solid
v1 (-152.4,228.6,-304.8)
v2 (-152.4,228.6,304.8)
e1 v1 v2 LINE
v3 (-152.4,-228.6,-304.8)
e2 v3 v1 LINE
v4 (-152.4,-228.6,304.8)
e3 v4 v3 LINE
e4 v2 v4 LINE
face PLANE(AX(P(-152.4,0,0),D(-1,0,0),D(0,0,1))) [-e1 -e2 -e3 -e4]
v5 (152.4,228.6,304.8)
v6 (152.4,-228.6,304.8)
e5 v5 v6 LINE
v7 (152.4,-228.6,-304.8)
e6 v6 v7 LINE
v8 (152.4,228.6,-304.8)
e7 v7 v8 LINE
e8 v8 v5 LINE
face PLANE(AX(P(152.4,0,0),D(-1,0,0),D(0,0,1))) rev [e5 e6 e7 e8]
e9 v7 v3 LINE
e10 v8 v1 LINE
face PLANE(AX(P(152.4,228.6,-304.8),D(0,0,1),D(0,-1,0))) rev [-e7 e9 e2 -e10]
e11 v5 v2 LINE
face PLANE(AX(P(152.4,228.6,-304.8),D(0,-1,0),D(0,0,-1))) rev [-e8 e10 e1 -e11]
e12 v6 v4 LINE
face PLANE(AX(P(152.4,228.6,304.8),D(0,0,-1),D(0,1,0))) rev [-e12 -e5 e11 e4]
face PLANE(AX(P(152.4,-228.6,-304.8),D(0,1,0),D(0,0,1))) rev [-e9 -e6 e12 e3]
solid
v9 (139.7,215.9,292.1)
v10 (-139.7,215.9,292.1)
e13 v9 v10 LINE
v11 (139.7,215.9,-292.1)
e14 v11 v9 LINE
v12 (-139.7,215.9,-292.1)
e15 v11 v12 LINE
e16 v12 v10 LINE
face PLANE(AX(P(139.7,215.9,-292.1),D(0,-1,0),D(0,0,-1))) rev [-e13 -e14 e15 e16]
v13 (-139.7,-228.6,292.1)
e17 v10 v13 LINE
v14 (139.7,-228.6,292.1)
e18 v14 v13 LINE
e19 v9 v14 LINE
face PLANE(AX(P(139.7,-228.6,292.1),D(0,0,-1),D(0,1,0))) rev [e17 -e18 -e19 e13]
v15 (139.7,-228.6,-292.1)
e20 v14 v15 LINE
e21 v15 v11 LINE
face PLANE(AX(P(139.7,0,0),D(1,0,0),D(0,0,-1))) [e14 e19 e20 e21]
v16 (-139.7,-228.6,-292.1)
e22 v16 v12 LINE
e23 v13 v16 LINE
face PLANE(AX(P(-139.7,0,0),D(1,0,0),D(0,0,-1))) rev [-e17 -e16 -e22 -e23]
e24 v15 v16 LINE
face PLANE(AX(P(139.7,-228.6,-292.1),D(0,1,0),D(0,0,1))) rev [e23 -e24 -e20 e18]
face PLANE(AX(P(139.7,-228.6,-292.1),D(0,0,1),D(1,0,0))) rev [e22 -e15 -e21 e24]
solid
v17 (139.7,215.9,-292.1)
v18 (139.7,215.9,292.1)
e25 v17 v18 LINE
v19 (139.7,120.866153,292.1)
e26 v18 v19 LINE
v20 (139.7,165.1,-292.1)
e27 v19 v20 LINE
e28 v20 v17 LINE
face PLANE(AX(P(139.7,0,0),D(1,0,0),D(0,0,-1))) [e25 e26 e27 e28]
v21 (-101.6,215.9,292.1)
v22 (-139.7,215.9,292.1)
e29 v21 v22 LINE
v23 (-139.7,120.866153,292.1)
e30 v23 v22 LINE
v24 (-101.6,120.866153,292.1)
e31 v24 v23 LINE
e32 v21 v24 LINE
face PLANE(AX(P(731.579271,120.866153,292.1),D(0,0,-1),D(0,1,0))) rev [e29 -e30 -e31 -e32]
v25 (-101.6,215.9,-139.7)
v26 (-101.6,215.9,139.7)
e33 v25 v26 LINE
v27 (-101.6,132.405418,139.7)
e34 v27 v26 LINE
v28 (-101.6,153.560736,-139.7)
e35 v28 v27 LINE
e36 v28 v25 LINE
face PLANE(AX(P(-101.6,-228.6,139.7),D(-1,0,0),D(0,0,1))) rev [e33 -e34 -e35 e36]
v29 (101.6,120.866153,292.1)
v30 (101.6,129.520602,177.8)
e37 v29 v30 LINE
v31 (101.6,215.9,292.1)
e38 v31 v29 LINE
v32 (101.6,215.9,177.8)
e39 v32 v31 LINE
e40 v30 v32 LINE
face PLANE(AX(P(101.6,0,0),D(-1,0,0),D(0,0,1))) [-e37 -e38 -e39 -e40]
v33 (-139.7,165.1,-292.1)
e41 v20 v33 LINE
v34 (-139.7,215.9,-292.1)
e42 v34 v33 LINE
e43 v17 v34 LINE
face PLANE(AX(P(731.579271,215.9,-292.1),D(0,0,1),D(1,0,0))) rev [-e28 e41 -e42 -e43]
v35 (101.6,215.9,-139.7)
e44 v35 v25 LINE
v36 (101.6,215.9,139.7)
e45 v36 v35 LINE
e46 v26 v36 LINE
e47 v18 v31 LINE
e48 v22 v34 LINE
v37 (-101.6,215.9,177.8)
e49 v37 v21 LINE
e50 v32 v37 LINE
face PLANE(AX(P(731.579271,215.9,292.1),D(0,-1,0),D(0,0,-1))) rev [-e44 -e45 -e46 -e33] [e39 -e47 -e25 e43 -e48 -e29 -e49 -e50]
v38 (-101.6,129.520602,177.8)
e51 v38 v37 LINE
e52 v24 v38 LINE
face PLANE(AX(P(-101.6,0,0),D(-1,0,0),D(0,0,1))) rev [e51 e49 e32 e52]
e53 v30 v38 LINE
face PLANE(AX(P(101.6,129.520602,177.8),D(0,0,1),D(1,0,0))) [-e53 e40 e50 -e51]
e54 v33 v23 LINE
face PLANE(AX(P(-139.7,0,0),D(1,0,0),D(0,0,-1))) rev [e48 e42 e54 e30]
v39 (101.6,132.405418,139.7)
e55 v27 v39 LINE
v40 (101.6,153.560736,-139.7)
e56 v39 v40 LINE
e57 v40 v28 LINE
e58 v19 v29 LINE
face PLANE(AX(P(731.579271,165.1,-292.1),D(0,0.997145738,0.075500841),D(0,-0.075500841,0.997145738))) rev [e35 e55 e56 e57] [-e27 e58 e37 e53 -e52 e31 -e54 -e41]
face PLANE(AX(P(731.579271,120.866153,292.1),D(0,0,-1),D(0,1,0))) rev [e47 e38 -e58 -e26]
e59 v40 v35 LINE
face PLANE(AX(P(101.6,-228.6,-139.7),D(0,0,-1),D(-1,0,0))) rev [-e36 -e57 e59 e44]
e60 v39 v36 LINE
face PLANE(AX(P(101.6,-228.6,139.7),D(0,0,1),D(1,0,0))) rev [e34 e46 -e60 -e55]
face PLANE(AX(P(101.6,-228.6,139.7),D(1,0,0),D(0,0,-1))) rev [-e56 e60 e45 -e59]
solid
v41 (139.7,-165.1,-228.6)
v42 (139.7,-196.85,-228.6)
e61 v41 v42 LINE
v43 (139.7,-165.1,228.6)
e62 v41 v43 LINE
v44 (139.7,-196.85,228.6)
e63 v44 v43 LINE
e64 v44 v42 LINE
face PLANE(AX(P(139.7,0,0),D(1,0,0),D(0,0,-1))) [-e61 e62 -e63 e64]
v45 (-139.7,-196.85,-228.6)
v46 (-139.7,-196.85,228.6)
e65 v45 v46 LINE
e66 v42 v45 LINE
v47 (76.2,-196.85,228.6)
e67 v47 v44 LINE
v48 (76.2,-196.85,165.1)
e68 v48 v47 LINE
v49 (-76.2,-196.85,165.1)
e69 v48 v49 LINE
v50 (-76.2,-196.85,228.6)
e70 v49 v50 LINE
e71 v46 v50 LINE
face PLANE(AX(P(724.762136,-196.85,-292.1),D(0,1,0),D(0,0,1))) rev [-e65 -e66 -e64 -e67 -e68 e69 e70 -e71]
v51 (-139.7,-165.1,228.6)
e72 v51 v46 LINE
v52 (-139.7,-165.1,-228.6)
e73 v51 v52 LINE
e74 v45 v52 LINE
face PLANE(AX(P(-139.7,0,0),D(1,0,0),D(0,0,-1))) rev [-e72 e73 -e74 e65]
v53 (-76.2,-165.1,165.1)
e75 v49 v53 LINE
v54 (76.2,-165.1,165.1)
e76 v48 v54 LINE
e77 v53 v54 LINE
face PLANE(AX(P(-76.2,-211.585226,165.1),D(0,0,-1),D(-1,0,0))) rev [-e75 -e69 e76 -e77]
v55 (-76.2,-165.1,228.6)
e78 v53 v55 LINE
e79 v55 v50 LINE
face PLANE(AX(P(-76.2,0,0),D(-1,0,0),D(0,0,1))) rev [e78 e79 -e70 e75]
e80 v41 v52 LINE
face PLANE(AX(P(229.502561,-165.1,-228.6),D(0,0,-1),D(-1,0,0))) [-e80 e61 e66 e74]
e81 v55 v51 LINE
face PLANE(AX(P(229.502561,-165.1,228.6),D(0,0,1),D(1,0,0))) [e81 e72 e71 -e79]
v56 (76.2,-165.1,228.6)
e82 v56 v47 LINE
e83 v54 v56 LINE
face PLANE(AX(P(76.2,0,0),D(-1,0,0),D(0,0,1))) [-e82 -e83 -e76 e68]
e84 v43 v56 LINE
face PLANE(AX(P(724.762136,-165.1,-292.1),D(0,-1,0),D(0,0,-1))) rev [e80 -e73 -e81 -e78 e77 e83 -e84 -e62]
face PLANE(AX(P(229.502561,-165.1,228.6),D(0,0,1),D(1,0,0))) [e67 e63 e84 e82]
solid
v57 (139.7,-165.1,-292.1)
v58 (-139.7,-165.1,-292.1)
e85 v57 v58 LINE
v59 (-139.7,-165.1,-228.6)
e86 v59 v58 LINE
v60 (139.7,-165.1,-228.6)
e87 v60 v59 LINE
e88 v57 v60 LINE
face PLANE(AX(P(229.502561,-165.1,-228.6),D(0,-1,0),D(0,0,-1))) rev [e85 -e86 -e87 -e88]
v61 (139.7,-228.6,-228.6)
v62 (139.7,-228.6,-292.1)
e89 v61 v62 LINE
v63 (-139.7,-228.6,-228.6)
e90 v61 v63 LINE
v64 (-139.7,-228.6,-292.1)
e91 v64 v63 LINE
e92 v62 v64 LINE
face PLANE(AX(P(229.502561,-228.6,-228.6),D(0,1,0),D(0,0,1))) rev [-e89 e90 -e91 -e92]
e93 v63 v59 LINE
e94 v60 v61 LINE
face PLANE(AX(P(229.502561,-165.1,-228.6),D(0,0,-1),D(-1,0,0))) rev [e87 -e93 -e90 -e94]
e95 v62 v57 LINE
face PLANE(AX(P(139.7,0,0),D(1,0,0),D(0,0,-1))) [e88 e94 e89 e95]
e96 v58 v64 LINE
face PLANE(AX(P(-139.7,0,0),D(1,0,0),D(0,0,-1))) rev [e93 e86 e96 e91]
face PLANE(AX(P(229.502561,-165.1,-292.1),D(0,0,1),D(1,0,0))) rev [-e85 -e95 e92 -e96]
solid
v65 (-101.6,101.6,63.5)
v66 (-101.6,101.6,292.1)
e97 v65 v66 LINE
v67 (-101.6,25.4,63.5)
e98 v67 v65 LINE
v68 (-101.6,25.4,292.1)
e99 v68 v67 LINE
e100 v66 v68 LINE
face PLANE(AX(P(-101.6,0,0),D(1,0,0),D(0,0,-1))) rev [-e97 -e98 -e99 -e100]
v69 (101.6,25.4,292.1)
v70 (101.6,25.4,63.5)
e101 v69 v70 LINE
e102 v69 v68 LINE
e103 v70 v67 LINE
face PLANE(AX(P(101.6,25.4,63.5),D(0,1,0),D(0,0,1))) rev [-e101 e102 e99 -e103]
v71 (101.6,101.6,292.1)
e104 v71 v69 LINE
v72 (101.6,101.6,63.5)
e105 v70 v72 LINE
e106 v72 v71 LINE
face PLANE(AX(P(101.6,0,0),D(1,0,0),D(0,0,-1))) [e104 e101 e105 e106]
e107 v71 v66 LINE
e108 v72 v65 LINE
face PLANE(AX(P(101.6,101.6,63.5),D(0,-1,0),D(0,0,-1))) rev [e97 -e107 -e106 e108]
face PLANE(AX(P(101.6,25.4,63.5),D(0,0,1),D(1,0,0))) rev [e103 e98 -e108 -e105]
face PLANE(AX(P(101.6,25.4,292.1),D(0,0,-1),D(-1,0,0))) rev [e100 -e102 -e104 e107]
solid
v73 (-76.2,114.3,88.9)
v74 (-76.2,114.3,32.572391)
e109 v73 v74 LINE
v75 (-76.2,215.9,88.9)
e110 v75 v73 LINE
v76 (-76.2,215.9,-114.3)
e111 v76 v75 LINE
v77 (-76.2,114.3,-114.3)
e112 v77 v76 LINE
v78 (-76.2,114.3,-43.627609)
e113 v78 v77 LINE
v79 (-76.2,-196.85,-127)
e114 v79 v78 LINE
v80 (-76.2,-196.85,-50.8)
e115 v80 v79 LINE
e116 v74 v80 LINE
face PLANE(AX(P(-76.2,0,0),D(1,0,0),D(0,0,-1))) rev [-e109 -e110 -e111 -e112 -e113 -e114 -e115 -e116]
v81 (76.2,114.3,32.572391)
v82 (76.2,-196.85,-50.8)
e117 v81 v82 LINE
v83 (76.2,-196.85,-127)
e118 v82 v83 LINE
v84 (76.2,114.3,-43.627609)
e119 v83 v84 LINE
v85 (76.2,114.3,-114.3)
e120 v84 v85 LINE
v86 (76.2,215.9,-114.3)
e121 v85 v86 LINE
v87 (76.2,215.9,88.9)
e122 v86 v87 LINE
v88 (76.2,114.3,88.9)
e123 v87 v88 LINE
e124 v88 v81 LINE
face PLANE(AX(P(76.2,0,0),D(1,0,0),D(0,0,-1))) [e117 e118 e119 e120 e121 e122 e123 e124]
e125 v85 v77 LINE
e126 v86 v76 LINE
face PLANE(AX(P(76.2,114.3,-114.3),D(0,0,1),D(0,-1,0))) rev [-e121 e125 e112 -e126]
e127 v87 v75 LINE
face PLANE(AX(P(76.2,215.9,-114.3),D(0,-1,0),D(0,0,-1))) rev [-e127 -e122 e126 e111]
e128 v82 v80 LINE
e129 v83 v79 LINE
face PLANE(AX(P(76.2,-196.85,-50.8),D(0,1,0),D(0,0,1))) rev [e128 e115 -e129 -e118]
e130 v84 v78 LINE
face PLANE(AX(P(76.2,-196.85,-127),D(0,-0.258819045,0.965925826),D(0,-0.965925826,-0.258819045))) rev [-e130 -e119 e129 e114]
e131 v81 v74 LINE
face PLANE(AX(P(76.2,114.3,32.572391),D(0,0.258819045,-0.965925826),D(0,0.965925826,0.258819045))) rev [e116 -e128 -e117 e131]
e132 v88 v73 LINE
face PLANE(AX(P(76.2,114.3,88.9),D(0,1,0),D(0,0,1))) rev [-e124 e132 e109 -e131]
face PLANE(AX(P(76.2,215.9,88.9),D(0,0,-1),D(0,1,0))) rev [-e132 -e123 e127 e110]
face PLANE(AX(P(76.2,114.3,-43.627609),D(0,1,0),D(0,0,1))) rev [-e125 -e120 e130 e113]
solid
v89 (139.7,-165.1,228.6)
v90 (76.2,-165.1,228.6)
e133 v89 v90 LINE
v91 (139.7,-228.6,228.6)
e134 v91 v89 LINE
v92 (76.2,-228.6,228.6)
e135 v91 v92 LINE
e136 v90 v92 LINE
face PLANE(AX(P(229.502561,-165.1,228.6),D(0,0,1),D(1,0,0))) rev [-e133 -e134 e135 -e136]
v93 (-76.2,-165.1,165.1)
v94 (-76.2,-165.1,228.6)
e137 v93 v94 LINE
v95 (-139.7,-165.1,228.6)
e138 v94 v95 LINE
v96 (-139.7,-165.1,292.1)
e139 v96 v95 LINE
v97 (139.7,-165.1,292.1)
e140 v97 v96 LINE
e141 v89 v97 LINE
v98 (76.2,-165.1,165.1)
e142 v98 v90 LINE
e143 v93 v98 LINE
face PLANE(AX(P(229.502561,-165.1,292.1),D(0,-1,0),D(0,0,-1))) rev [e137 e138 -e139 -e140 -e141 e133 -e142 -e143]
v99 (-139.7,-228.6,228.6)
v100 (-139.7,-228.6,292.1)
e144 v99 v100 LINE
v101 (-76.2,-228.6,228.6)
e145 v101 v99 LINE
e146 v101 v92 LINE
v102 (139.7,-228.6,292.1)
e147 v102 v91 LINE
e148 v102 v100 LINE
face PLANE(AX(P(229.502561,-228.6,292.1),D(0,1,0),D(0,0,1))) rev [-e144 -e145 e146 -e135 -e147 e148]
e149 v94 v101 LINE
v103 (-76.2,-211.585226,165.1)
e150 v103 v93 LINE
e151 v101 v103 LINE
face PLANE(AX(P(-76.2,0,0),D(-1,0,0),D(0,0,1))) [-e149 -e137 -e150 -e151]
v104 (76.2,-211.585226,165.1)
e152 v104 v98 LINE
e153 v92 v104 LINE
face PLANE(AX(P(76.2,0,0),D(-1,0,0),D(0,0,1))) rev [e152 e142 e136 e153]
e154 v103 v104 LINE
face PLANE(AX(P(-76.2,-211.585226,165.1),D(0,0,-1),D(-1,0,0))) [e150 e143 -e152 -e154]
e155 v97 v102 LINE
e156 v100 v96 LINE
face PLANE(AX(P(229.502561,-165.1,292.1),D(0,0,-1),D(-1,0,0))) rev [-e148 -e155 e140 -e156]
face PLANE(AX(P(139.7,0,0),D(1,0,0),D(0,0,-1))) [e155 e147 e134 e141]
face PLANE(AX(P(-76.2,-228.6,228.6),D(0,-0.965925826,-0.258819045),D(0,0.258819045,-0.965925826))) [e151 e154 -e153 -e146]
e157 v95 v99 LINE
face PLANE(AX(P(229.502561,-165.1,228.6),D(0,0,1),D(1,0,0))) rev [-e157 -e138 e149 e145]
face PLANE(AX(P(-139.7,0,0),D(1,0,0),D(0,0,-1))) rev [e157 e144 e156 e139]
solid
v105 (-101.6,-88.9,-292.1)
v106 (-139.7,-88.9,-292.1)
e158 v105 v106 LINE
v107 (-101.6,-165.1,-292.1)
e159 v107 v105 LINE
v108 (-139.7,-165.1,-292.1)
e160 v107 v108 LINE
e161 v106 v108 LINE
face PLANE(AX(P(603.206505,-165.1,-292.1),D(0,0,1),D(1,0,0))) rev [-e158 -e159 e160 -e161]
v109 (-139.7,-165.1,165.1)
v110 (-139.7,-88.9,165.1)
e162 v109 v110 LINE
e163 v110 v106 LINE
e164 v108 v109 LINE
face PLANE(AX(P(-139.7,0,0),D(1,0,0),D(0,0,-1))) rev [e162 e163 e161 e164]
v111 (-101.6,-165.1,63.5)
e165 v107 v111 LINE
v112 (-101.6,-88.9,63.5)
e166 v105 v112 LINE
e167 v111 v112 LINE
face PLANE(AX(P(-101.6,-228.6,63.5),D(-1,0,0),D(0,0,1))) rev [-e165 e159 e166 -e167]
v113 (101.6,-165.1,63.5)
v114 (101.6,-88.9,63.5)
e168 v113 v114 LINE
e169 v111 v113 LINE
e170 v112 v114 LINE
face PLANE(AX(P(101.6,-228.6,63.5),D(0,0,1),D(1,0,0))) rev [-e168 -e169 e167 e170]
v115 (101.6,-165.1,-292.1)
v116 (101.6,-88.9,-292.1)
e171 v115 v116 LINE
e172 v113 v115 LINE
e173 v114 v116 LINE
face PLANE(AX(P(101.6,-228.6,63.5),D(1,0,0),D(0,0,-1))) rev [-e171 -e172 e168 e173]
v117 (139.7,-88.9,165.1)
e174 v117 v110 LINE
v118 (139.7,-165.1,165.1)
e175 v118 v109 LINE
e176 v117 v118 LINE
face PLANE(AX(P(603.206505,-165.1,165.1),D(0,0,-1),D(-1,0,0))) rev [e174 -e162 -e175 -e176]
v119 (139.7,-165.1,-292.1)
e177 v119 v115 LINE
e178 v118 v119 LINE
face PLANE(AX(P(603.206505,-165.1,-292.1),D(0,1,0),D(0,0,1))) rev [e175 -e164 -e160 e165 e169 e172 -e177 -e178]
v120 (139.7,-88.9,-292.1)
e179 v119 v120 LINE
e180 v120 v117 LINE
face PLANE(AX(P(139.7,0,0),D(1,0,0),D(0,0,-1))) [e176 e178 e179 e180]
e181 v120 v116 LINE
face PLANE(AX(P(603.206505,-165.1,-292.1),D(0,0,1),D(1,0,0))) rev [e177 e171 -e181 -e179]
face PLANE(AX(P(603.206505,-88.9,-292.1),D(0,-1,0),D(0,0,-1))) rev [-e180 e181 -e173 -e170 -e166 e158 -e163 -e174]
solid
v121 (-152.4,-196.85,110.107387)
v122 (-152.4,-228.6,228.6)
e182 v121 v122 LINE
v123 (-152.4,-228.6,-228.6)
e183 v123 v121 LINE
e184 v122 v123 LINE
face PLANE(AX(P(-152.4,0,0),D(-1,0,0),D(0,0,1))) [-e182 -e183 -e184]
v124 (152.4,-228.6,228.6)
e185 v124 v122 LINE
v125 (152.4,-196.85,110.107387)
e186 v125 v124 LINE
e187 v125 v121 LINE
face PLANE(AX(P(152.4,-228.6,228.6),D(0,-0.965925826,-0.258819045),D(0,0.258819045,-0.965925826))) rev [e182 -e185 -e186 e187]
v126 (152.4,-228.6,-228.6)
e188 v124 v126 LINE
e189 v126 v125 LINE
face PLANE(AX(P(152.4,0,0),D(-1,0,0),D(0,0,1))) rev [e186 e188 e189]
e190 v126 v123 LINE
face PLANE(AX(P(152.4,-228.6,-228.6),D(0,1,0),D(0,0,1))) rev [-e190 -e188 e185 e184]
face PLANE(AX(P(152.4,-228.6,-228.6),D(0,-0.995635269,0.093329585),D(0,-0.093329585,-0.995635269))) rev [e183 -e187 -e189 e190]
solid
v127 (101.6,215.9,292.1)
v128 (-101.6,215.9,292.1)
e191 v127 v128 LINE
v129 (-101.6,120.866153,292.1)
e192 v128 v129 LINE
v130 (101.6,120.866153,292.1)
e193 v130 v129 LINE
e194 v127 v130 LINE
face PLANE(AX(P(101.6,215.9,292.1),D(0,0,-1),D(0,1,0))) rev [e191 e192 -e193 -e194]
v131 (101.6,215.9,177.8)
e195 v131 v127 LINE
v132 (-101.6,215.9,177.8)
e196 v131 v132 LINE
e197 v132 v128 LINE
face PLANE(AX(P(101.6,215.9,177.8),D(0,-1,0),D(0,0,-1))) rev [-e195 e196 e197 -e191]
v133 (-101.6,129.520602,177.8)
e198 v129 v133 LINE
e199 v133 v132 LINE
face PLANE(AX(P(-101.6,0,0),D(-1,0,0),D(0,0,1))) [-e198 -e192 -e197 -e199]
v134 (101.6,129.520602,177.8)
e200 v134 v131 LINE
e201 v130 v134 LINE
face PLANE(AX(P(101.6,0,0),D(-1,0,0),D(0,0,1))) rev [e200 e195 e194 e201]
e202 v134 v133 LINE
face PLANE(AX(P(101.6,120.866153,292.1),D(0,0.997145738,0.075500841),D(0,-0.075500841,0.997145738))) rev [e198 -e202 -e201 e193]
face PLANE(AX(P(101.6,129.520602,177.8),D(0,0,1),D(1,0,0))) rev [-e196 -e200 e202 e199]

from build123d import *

# Parameters (mm, degrees)
SKETCH2_W                               = 609.6
SKETCH2_H                               = 457.2
VOLUME_ENVELOPE_DEPTH                   = 152.4
SKETCH4_W                               = 584.2
SKETCH4_H                               = 444.5
SAFE_VOLUME_DEPTH                       = 139.7
RAMP_INTERFERENCE_DEPTH                 = 152.4
DRIVE_SYSTEM_REACH                      = 412.35
SKETCH5_W                               = 63.5
SKETCH5_H                               = 63.5
DRIVE_SYSTEM_DIRECTION_2_REACH          = 412.35
DRIVE_MOTOR_DEPTH                       = 76.2
DRIVE_MOTOR_DEPTH_BACK                  = 76.2
BASE_PLATE_REACH                        = 412.35
SKETCH7_W                               = 584.2
SKETCH7_H                               = 31.75
BASE_PLATE_DIRECTION_2_REACH            = 412.35
INDENT1_START                           = 165.1
INDENT1_OUTLINE_W                       = 152.4
INDENT1_OUTLINE_H                       = 31.75
INDENT1_DEPTH                           = 127
INDENT1_START_2                         = -292.1
INDENT1_2_OUTLINE_W                     = 279.4
INDENT1_2_OUTLINE_H                     = 31.75
INDENT1_2_DEPTH                         = 63.5
INDENT1_START_3                         = 228.6
INDENT1_3_OUTLINE_W                     = 63.5
INDENT1_3_OUTLINE_H                     = 31.75
INDENT1_3_DEPTH                         = 63.5
SLIDE_SYSTEM_REACH                      = 412.35
SLIDE_SYSTEM_DIRECTION_2_REACH          = 412.35
SKETCH9_W                               = 203.2
SKETCH9_H                               = 279.4
MARIOCUTOUT_DEPTH                       = 561.097357608
SORTER_DEPTH                            = 101.6
SORTERCUTOUT_START                      = -101.6
SORTERCUTOUT_DEPTH                      = 203.2
SKETCH11_W                              = 228.6
SKETCH11_H                              = 76.2
LUMA_DEPOSITER_DEPTH                    = 101.6
MARIO_LIFTER_DEPTH                      = 76.2
KOOPER_COIN_MECHANISM_REACH             = 412.35
SKETCH13_W                              = 457.2
SKETCH13_H                              = 76.2
KOOPER_COIN_MECHANISM_DIRECTION_2_REACH = 412.35
SKETCH14_W                              = 203.2
SKETCH14_H                              = 355.6
CUT_EXTRUDE2_DEPTH                      = 466.762868851


# Read off the part's stored shape, not the designer's step: Indent1, SorterCutout
with BuildPart() as part:
    # Sketch2 → Volume Envelope (new, symmetric)
    with BuildSketch(Plane(origin=(0, 0, 0), x_dir=(0, 0, -1), z_dir=(1, 0, 0))):
        Rectangle(SKETCH2_W, SKETCH2_H)
    extrude(amount=VOLUME_ENVELOPE_DEPTH, both=True)


with BuildPart() as body_2:
    # Sketch4 → Safe Volume (new, symmetric)
    with BuildSketch(Plane(origin=(0, 0, 0), x_dir=(0, 0, -1), z_dir=(1, 0, 0))):
        with Locations((0, -6.35)):
            Rectangle(SKETCH4_W, SKETCH4_H)
    extrude(amount=SAFE_VOLUME_DEPTH, both=True)


with BuildPart() as body_3:
    # Sketch1 → Ramp Interference (new, symmetric)
    with BuildSketch(Plane(origin=(0, 0, 0), x_dir=(0, 0, -1), z_dir=(1, 0, 0))):
        Polygon((-228.6, -228.6), (-110.10738686, -196.85), (228.6, -228.6), align=None)
    extrude(amount=RAMP_INTERFERENCE_DEPTH, both=True)


with BuildPart() as body_4:

    # Drive System: up to this face of the body (flat: up to its plane)
    drive_system_end = Plane(body_2.part.faces().sort_by_distance((139.7, -6.35, 0))[0])
    # Sketch5 → Drive System (new, up to the picked face)
    with BuildSketch(Plane(origin=(0, 0, 0), x_dir=(0, 0, -1), z_dir=(1, 0, 0)), mode=Mode.PRIVATE) as drive_system_sk1:
        with Locations((-260.35, -196.85)):
            Rectangle(SKETCH5_W, SKETCH5_H)
    drive_system_tool1 = split(extrude(drive_system_sk1.sketch, amount=DRIVE_SYSTEM_REACH, mode=Mode.PRIVATE), bisect_by=drive_system_end, keep=Keep.BOTH, mode=Mode.PRIVATE)
    # Sketch5 → Drive System (new, up to the picked face)
    with BuildSketch(Plane(origin=(0, 0, 0), x_dir=(0, 0, -1), z_dir=(1, 0, 0)), mode=Mode.PRIVATE) as drive_system_sk2:
        with Locations((260.35, -196.85)):
            Rectangle(SKETCH5_W, SKETCH5_H)
    drive_system_tool2 = split(extrude(drive_system_sk2.sketch, amount=DRIVE_SYSTEM_REACH, mode=Mode.PRIVATE), bisect_by=drive_system_end, keep=Keep.BOTH, mode=Mode.PRIVATE)
    add(drive_system_tool1.solids().sort_by(Axis((0, -196.85, 260.35), (1, 0, 0)))[0])
    add(drive_system_tool2.solids().sort_by(Axis((0, -196.85, -260.35), (1, 0, 0)))[0])


    # Drive System direction 2: up to this face of the body (flat: up to its plane)
    drive_system_direction_2_end = Plane(body_2.part.faces().sort_by_distance((-139.7, -6.35, 0))[0])
    # Sketch5 → Drive System direction 2 (add, up to the picked face)
    with BuildSketch(Plane(origin=(0, 0, 0), x_dir=(0, 0, -1), z_dir=(1, 0, 0)), mode=Mode.PRIVATE) as drive_system_direction_2_sk1:
        with Locations((-260.35, -196.85)):
            Rectangle(SKETCH5_W, SKETCH5_H)
    drive_system_direction_2_tool1 = split(extrude(drive_system_direction_2_sk1.sketch, amount=-DRIVE_SYSTEM_DIRECTION_2_REACH, mode=Mode.PRIVATE), bisect_by=drive_system_direction_2_end, keep=Keep.BOTH, mode=Mode.PRIVATE)
    # Sketch5 → Drive System direction 2 (add, up to the picked face)
    with BuildSketch(Plane(origin=(0, 0, 0), x_dir=(0, 0, -1), z_dir=(1, 0, 0)), mode=Mode.PRIVATE) as drive_system_direction_2_sk2:
        with Locations((260.35, -196.85)):
            Rectangle(SKETCH5_W, SKETCH5_H)
    drive_system_direction_2_tool2 = split(extrude(drive_system_direction_2_sk2.sketch, amount=-DRIVE_SYSTEM_DIRECTION_2_REACH, mode=Mode.PRIVATE), bisect_by=drive_system_direction_2_end, keep=Keep.BOTH, mode=Mode.PRIVATE)
    add(drive_system_direction_2_tool1.solids().sort_by(Axis((0, -196.85, 260.35), (-1, 0, 0)))[0])
    add(drive_system_direction_2_tool2.solids().sort_by(Axis((0, -196.85, -260.35), (-1, 0, 0)))[0])

    # Sketch6 → Drive Motor (add, two sides: drawn at the far end of the back side and taken through both)
    with BuildSketch(Plane(origin=(0, 0, 0), x_dir=(0, 0, -1), z_dir=(1, 0, 0)).offset(-DRIVE_MOTOR_DEPTH_BACK)):
        Polygon((-228.6, -228.6), (-165.1, -211.585226281), (-165.1, -165.1), (-228.6, -165.1), align=None)
    extrude(amount=DRIVE_MOTOR_DEPTH + DRIVE_MOTOR_DEPTH_BACK)


with BuildPart() as body_5:

    # Base Plate: up to this face of the body (flat: up to its plane)
    base_plate_end = Plane(body_2.part.faces().sort_by_distance((139.7, -6.35, 0))[0])
    # Sketch7 → Base Plate (new, up to the picked face)
    with BuildSketch(Plane(origin=(0, 0, 0), x_dir=(0, 0, -1), z_dir=(1, 0, 0)), mode=Mode.PRIVATE) as base_plate_sk1:
        with Locations((0, -180.975)):
            Rectangle(SKETCH7_W, SKETCH7_H)
    base_plate_tool1 = split(extrude(base_plate_sk1.sketch, amount=BASE_PLATE_REACH, mode=Mode.PRIVATE), bisect_by=base_plate_end, keep=Keep.BOTH, mode=Mode.PRIVATE)
    add(base_plate_tool1.solids().sort_by(Axis((0, -180.975, 0), (1, 0, 0)))[0])


    # Base Plate direction 2: up to this face of the body (flat: up to its plane)
    base_plate_direction_2_end = Plane(body_2.part.faces().sort_by_distance((-139.7, -6.35, 0))[0])
    # Sketch7 → Base Plate direction 2 (add, up to the picked face)
    with BuildSketch(Plane(origin=(0, 0, 0), x_dir=(0, 0, -1), z_dir=(1, 0, 0)), mode=Mode.PRIVATE) as base_plate_direction_2_sk1:
        with Locations((0, -180.975)):
            Rectangle(SKETCH7_W, SKETCH7_H)
    base_plate_direction_2_tool1 = split(extrude(base_plate_direction_2_sk1.sketch, amount=-BASE_PLATE_DIRECTION_2_REACH, mode=Mode.PRIVATE), bisect_by=base_plate_direction_2_end, keep=Keep.BOTH, mode=Mode.PRIVATE)
    add(base_plate_direction_2_tool1.solids().sort_by(Axis((0, -180.975, 0), (-1, 0, 0)))[0])

    # Indent1 outline → Indent1 (cut)
    with BuildSketch(Plane.XY.offset(INDENT1_START)):
        with Locations((0, -180.975)):
            Rectangle(INDENT1_OUTLINE_W, INDENT1_OUTLINE_H)
    extrude(amount=INDENT1_DEPTH, mode=Mode.SUBTRACT)

    # Indent1 2 outline → Indent1 2 (cut)
    with BuildSketch(Plane.XY.offset(INDENT1_START_2)):
        with Locations((0, -180.975)):
            Rectangle(INDENT1_2_OUTLINE_W, INDENT1_2_OUTLINE_H)
    extrude(amount=INDENT1_2_DEPTH, mode=Mode.SUBTRACT)

    # Indent1 3 outline → Indent1 3 (cut)
    with BuildSketch(Plane.XY.offset(INDENT1_START_3)):
        with Locations((-107.95, -180.975)):
            Rectangle(INDENT1_3_OUTLINE_W, INDENT1_3_OUTLINE_H)
        with Locations((107.95, -180.975)):
            Rectangle(INDENT1_3_OUTLINE_W, INDENT1_3_OUTLINE_H)
    extrude(amount=INDENT1_3_DEPTH, mode=Mode.SUBTRACT)


with BuildPart() as body_6:

    # Slide System: up to this face of the body (flat: up to its plane)
    slide_system_end = Plane(body_2.part.faces().sort_by_distance((139.7, -6.35, 0))[0])
    # Sketch8 → Slide System (new, up to the picked face)
    with BuildSketch(Plane(origin=(0, 0, 0), x_dir=(0, 0, -1), z_dir=(1, 0, 0)), mode=Mode.PRIVATE) as slide_system_sk1:
        Polygon((-292.1, 120.866153447), (-292.1, 215.9), (292.1, 215.9), (292.1, 165.1), align=None)
    slide_system_tool1 = split(extrude(slide_system_sk1.sketch, amount=SLIDE_SYSTEM_REACH, mode=Mode.PRIVATE), bisect_by=slide_system_end, keep=Keep.BOTH, mode=Mode.PRIVATE)
    add(slide_system_tool1.solids().sort_by(Axis((0, 178.323466, 29.53294), (1, 0, 0)))[0])


    # Slide System direction 2: up to this face of the body (flat: up to its plane)
    slide_system_direction_2_end = Plane(body_2.part.faces().sort_by_distance((-139.7, -6.35, 0))[0])
    # Sketch8 → Slide System direction 2 (add, up to the picked face)
    with BuildSketch(Plane(origin=(0, 0, 0), x_dir=(0, 0, -1), z_dir=(1, 0, 0)), mode=Mode.PRIVATE) as slide_system_direction_2_sk1:
        Polygon((-292.1, 120.866153447), (-292.1, 215.9), (292.1, 215.9), (292.1, 165.1), align=None)
    slide_system_direction_2_tool1 = split(extrude(slide_system_direction_2_sk1.sketch, amount=-SLIDE_SYSTEM_DIRECTION_2_REACH, mode=Mode.PRIVATE), bisect_by=slide_system_direction_2_end, keep=Keep.BOTH, mode=Mode.PRIVATE)
    add(slide_system_direction_2_tool1.solids().sort_by(Axis((0, 178.323466, 29.53294), (-1, 0, 0)))[0])

    # Sketch9 → MarioCutout (cut, through all)
    with BuildSketch(Plane(origin=(0, 215.9, 0), x_dir=(1, 0, 0), z_dir=(0, 1, 0))):
        Rectangle(SKETCH9_W, SKETCH9_H)
    extrude(amount=-MARIOCUTOUT_DEPTH, mode=Mode.SUBTRACT)

    # SorterCutout outline → SorterCutout (cut)
    with BuildSketch(Plane.YZ.offset(SORTERCUTOUT_START)):
        Polygon((129.520601685, 177.8), (215.9, 177.8), (215.9, 292.1), (120.866153447, 292.1), align=None)
    extrude(amount=SORTERCUTOUT_DEPTH, mode=Mode.SUBTRACT)


with BuildPart() as body_7:
    # Sketch10 → Sorter (new, symmetric)
    with BuildSketch(Plane(origin=(0, 0, 0), x_dir=(0, 0, -1), z_dir=(1, 0, 0))):
        Polygon((-292.1, 120.866153447), (-177.8, 129.520601685), (-177.8, 215.9), (-292.1, 215.9), align=None)
    extrude(amount=SORTER_DEPTH, both=True)


with BuildPart() as body_8:
    # Sketch11 → Luma Depositer (new, symmetric)
    with BuildSketch(Plane(origin=(0, 0, 0), x_dir=(0, 0, -1), z_dir=(1, 0, 0))):
        with Locations((-177.8, 63.5)):
            Rectangle(SKETCH11_W, SKETCH11_H)
    extrude(amount=LUMA_DEPOSITER_DEPTH, both=True)


with BuildPart() as body_9:
    # Sketch12 → Mario Lifter (new, symmetric)
    with BuildSketch(Plane(origin=(0, 0, 0), x_dir=(0, 0, -1), z_dir=(1, 0, 0))):
        Polygon((-88.9, 215.9), (-88.9, 114.3), (-32.572391225, 114.3), (50.8, -196.85), (127, -196.85), (43.627608775, 114.3), (114.3, 114.3), (114.3, 215.9), align=None)
    extrude(amount=MARIO_LIFTER_DEPTH, both=True)


with BuildPart() as body_10:

    # Kooper/Coin Mechanism: up to this face of the body (flat: up to its plane)
    kooper_coin_mechanism_end = Plane(body_2.part.faces().sort_by_distance((139.7, -6.35, 0))[0])
    # Sketch13 → Kooper/Coin Mechanism (new, up to the picked face)
    with BuildSketch(Plane(origin=(0, 0, 0), x_dir=(0, 0, -1), z_dir=(1, 0, 0)), mode=Mode.PRIVATE) as kooper_coin_mechanism_sk1:
        with Locations((63.5, -127)):
            Rectangle(SKETCH13_W, SKETCH13_H)
    kooper_coin_mechanism_tool1 = split(extrude(kooper_coin_mechanism_sk1.sketch, amount=KOOPER_COIN_MECHANISM_REACH, mode=Mode.PRIVATE), bisect_by=kooper_coin_mechanism_end, keep=Keep.BOTH, mode=Mode.PRIVATE)
    add(kooper_coin_mechanism_tool1.solids().sort_by(Axis((0, -127, -63.5), (1, 0, 0)))[0])


    # Kooper/Coin Mechanism direction 2: up to this face of the body (flat: up to its plane)
    kooper_coin_mechanism_direction_2_end = Plane(body_2.part.faces().sort_by_distance((-139.7, -6.35, 0))[0])
    # Sketch13 → Kooper/Coin Mechanism direction 2 (add, up to the picked face)
    with BuildSketch(Plane(origin=(0, 0, 0), x_dir=(0, 0, -1), z_dir=(1, 0, 0)), mode=Mode.PRIVATE) as kooper_coin_mechanism_direction_2_sk1:
        with Locations((63.5, -127)):
            Rectangle(SKETCH13_W, SKETCH13_H)
    kooper_coin_mechanism_direction_2_tool1 = split(extrude(kooper_coin_mechanism_direction_2_sk1.sketch, amount=-KOOPER_COIN_MECHANISM_DIRECTION_2_REACH, mode=Mode.PRIVATE), bisect_by=kooper_coin_mechanism_direction_2_end, keep=Keep.BOTH, mode=Mode.PRIVATE)
    add(kooper_coin_mechanism_direction_2_tool1.solids().sort_by(Axis((0, -127, -63.5), (-1, 0, 0)))[0])

    # Sketch14 → Cut-Extrude2 (cut, through all)
    with BuildSketch(Plane(origin=(0, -88.9, 0), x_dir=(1, 0, 0), z_dir=(0, 1, 0))):
        with Locations((0, 114.3)):
            Rectangle(SKETCH14_W, SKETCH14_H)
    extrude(amount=-CUT_EXTRUDE2_DEPTH, mode=Mode.SUBTRACT)


solid = Compound([part.part, body_2.part, body_3.part, body_4.part, body_5.part, body_6.part, body_7.part, body_8.part, body_9.part, body_10.part])
